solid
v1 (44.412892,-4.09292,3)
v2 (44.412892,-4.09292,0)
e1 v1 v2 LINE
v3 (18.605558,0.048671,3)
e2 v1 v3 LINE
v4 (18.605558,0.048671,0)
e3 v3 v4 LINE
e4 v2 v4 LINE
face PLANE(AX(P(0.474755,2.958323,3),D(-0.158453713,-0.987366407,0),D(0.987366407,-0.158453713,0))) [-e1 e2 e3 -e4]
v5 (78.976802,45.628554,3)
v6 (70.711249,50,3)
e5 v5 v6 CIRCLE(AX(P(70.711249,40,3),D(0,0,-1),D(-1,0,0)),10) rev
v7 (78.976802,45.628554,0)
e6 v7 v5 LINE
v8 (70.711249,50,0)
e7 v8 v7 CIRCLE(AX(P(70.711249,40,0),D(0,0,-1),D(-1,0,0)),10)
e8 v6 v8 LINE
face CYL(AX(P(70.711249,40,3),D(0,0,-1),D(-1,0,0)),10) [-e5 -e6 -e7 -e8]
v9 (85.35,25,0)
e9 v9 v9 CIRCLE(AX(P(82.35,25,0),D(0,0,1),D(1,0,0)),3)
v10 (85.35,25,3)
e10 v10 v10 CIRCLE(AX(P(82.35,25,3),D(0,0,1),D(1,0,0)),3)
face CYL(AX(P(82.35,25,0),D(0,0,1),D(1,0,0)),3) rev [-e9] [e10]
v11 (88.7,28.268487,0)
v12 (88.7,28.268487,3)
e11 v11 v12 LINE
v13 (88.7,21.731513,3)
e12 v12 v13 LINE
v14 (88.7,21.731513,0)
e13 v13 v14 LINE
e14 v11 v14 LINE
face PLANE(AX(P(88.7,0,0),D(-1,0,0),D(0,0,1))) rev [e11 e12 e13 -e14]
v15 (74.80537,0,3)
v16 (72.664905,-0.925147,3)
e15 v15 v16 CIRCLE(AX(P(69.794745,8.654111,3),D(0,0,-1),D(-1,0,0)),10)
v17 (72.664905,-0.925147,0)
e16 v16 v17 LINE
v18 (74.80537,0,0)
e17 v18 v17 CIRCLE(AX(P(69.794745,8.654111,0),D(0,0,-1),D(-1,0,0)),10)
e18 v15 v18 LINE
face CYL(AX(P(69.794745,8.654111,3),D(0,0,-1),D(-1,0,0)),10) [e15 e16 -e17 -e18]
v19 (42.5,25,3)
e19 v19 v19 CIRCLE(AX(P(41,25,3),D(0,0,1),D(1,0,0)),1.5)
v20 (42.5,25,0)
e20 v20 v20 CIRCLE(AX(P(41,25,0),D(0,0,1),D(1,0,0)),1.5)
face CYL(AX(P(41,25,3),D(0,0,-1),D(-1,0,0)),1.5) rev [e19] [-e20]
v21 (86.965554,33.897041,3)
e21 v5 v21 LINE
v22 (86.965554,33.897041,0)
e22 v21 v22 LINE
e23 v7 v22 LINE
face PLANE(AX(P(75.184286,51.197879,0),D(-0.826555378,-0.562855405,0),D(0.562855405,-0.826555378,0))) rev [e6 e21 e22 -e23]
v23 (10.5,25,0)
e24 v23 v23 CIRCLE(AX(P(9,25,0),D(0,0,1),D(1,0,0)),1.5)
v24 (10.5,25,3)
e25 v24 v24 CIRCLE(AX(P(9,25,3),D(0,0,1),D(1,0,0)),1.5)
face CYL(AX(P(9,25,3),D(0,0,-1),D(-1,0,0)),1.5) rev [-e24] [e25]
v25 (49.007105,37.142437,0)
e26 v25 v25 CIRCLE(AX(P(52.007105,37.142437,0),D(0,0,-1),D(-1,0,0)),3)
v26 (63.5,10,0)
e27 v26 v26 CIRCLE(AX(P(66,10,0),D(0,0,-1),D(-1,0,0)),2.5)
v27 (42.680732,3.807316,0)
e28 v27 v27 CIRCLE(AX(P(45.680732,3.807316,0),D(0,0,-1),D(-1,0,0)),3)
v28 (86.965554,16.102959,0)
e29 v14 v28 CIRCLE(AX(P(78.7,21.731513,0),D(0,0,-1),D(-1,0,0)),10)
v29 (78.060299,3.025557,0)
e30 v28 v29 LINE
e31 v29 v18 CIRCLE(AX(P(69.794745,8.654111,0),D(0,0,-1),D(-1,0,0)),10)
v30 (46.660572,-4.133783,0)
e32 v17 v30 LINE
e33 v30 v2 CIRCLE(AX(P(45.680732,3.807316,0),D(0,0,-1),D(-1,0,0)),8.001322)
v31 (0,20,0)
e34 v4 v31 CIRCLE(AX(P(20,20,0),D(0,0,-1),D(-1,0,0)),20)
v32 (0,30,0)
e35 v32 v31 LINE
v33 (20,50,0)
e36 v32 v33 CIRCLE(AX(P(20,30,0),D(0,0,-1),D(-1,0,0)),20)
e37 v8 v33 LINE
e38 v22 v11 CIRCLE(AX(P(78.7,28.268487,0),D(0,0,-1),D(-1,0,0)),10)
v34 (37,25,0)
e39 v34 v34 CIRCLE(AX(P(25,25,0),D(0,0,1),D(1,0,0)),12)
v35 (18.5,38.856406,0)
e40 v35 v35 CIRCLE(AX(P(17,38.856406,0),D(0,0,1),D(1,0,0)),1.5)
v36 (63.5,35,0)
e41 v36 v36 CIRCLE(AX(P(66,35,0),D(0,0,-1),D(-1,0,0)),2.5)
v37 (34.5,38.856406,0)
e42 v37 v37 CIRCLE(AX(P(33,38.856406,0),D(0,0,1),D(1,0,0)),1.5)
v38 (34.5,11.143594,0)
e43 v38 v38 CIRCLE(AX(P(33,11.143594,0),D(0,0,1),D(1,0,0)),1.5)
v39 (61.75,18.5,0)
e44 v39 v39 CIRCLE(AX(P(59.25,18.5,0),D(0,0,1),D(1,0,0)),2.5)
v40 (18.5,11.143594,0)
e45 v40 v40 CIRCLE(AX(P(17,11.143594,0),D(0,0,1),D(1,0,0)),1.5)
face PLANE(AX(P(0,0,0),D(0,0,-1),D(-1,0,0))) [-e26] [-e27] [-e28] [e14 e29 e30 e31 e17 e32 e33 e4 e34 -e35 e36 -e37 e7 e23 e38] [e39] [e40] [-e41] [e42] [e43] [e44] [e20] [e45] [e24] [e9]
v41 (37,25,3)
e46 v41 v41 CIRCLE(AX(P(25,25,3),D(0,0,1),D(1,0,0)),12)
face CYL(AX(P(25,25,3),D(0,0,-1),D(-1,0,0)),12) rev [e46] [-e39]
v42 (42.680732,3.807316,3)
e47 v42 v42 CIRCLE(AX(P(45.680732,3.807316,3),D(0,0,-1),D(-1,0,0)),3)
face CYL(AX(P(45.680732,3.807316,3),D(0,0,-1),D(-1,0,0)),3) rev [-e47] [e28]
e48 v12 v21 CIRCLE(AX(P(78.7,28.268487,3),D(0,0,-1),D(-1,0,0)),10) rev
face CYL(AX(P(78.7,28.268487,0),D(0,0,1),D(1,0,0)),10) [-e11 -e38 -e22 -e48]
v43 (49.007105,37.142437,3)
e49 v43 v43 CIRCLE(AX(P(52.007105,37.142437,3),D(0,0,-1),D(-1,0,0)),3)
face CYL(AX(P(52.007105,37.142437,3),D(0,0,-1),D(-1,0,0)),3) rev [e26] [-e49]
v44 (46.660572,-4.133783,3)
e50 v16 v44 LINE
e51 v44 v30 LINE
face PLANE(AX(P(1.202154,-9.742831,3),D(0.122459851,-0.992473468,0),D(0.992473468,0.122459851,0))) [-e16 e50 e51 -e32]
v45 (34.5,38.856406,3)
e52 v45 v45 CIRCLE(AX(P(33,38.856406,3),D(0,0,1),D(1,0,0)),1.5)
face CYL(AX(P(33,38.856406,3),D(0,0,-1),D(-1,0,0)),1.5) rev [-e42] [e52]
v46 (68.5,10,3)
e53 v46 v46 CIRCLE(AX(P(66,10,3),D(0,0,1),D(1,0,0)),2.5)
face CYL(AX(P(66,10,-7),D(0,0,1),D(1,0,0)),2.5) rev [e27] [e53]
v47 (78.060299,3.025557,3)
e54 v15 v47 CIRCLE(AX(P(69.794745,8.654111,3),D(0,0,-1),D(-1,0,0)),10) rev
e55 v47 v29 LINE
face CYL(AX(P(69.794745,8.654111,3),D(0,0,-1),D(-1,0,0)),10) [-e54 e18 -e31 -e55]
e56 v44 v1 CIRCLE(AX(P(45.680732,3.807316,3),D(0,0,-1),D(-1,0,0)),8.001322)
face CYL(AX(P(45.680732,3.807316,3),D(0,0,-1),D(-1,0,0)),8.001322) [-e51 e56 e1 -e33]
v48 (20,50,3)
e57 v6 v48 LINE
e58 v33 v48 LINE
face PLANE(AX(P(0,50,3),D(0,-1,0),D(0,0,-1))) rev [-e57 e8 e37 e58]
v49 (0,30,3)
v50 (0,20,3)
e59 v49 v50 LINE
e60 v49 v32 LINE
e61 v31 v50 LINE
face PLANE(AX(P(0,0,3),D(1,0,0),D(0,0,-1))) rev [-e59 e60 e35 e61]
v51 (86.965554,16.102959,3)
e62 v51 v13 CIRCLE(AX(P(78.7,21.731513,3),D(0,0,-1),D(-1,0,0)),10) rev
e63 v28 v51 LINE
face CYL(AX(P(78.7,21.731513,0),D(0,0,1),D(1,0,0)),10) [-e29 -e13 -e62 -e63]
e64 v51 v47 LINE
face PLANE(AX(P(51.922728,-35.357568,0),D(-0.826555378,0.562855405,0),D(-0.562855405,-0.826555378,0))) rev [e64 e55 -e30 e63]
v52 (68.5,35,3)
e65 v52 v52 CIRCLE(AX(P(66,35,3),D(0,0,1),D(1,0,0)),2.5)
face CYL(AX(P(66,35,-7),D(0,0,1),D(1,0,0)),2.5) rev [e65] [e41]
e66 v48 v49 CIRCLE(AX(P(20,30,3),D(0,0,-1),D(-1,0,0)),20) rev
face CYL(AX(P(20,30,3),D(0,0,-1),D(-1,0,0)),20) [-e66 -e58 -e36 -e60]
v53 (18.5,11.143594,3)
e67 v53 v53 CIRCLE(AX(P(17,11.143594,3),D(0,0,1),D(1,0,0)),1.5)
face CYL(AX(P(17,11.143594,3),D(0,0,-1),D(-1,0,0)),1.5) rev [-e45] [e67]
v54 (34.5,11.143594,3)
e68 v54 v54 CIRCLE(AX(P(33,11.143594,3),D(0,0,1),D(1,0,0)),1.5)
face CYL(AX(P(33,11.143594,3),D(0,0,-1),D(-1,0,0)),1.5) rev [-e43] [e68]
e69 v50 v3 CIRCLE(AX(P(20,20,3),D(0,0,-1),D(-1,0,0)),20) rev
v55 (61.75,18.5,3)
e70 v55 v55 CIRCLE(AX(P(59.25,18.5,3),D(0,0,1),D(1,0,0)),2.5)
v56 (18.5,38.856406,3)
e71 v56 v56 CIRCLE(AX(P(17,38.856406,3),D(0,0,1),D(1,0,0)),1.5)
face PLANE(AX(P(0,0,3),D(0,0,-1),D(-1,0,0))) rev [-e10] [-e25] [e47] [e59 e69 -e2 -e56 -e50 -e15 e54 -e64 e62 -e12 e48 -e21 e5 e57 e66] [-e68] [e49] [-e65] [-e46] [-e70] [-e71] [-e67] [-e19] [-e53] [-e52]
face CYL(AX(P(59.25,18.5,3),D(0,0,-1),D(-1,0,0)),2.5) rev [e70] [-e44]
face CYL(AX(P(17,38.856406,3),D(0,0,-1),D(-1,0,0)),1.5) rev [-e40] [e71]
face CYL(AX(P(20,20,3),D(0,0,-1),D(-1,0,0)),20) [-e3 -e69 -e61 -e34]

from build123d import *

# Parameters (mm, degrees)
ESBO_O1_W                = 76
ESBO_O1_H                = 50
ESBO_O1_R                = 2.5
ESBO_O1_R_2              = 12
ESBO_O1_R_3              = 1.5
RESSALTO_EXTRUS_O1_DEPTH = 3
ESBO_O2_R                = 2.5
CORTE_EXTRUS_O1_DEPTH    = 3
FILETE1_R                = 20
ESBO_O3_R                = 2.5
RESSALTO_EXTRUS_O2_DEPTH = 3
ESBO_O5_R                = 3
CORTE_EXTRUS_O2_DEPTH    = 92.021975369
RESSALTO_EXTRUS_O3_DEPTH = 3
RESSALTO_EXTRUS_O4_DEPTH = 3
FILETE2_R                = 10
ESBO_O7_R                = 2.5
CORTE_EXTRUS_O3_DEPTH    = 10


with BuildPart() as part:
    # Esboço1 → Ressalto-extrusão1 (new body)
    with BuildSketch(Plane.XY):
        with Locations((38, 25)):
            Rectangle(ESBO_O1_W, ESBO_O1_H)
        with Locations((59.25, 18.5)):
            Circle(ESBO_O1_R, mode=Mode.SUBTRACT)
        with Locations((25, 25)):
            Circle(ESBO_O1_R_2, mode=Mode.SUBTRACT)
        with Locations((17, 38.856406461)):
            Circle(ESBO_O1_R_3, mode=Mode.SUBTRACT)
        with Locations((33, 38.856406461)):
            Circle(ESBO_O1_R_3, mode=Mode.SUBTRACT)
        with Locations((41, 25)):
            Circle(ESBO_O1_R_3, mode=Mode.SUBTRACT)
        with Locations((33, 11.143593539)):
            Circle(ESBO_O1_R_3, mode=Mode.SUBTRACT)
        with Locations((17, 11.143593539)):
            Circle(ESBO_O1_R_3, mode=Mode.SUBTRACT)
        with Locations((9, 25)):
            Circle(ESBO_O1_R_3, mode=Mode.SUBTRACT)
    extrude(amount=RESSALTO_EXTRUS_O1_DEPTH)

    # Esboço2 → Corte-extrusão1 (cut)
    with BuildSketch(Plane.XY.offset(3)):
        with Locations((66, 35)):
            Circle(ESBO_O2_R)
        with Locations((66, 15)):
            Circle(ESBO_O2_R)
    extrude(amount=-CORTE_EXTRUS_O1_DEPTH, mode=Mode.SUBTRACT)

    # Filete1
    filete1_edges = [part.edges().sort_by_distance(p)[0] for p in [
        (0, 50, 1.5),
        (0, 0, 1.5),
    ]]
    fillet(filete1_edges, radius=FILETE1_R)

    # Esboço3 → Ressalto-extrusão2 (add, through all)
    with BuildSketch(Plane.XY.offset(3)):
        with Locations((66, 15)):
            Circle(ESBO_O3_R)
        with Locations((66, 35)):
            Circle(ESBO_O3_R)
    extrude(amount=-RESSALTO_EXTRUS_O2_DEPTH)

    # Esboço5 → Corte-extrusão2 (cut, through all)
    with BuildSketch(Plane(origin=(0, 0, 0), x_dir=(-1, 0, 0), z_dir=(0, 0, -1))):
        with Locations((-45.680731562, 3.807316308)):
            Circle(ESBO_O5_R)
        with Locations((-52.0071049, 37.142437356)):
            Circle(ESBO_O5_R)
    extrude(amount=-CORTE_EXTRUS_O2_DEPTH, mode=Mode.SUBTRACT)

    # Esboço4 → Ressalto-extrusão3 (add, through all)
    with BuildSketch(Plane(origin=(0, 0, 0), x_dir=(-1, 0, 0), z_dir=(0, 0, -1))):
        with BuildLine():
            ThreePointArc((-18.605557994, 0.048670934), (-19.30235443, 0.012171437), (-20, 0))
            Line((-20, 0), (-74.805369877, 0))
            ThreePointArc((-74.805369877, 0), (-73.762195737, -0.525177263), (-72.66490464, -0.925146879))
            Line((-72.66490464, -0.925146879), (-46.660572258, -4.133783454))
            ThreePointArc((-46.660572258, -4.133783454), (-45.535290053, -4.192683692), (-44.412892385, -4.09292021))
            Line((-44.412892385, -4.09292021), (-18.605557994, 0.048670934))
        make_face()
    extrude(amount=-RESSALTO_EXTRUS_O3_DEPTH)

    # Esboço6 → Ressalto-extrusão4 (add, through all)
    with BuildSketch(Plane.XY.offset(3)):
        with BuildLine():
            Line((88.7, 31.35), (76, 50))
            Line((76, 50), (76, 25))
            Line((76, 25), (79.35, 25))
            ThreePointArc((79.35, 25), (82.35, 28), (85.35, 25))
            Line((85.35, 25), (88.7, 25))
            Line((88.7, 25), (88.7, 31.35))
        make_face()
        with BuildLine():
            Line((79.35, 25), (76, 25))
            Line((76, 25), (76, 0))
            Line((76, 0), (88.7, 18.65))
            Line((88.7, 18.65), (88.7, 25))
            Line((88.7, 25), (85.35, 25))
            ThreePointArc((85.35, 25), (82.35, 22), (79.35, 25))
        make_face()
    extrude(amount=-RESSALTO_EXTRUS_O4_DEPTH)

    # Filete2
    # the kernel refuses this fillet: 10 mm, written as the material it takes off along each edge
    with BuildSketch(Plane(origin=(88.7, 18.65, 10.703782372), x_dir=(-0.5628554049483921, -0.8265553781328759, 0), z_dir=(0, 0, -1)), Plane(origin=(88.7, 31.35, 10.703782372), x_dir=(0, -1, 0), z_dir=(0, 0, -1))) as filete2_piece_1:
        with BuildLine():
            CenterArc((FILETE2_R * 0.308151294884, FILETE2_R), FILETE2_R, 235.746501053, 34.253498947)
            Line((-FILETE2_R * 0.254704110065, FILETE2_R * 0.173444621867), (-FILETE2_R * 0.265961218164, FILETE2_R * 0.156913514304))
            Line((-FILETE2_R * 0.265961218164, FILETE2_R * 0.156913514304), (-FILETE2_R * 0.00616302589767, -FILETE2_R * 0.02))
            Line((-FILETE2_R * 0.00616302589767, -FILETE2_R * 0.02), (FILETE2_R * 0.308151294884, -FILETE2_R * 0.02))
            Line((FILETE2_R * 0.308151294884, -FILETE2_R * 0.02), (FILETE2_R * 0.308151294884, 0))
        make_face()
    extrude(amount=18.407564744, mode=Mode.SUBTRACT)
    with BuildSketch(Plane(origin=(76, 50, -13.221878613), x_dir=(-1, 0, 0), z_dir=(0, 0, 1))) as filete2_piece_2:
        with BuildLine():
            CenterArc((FILETE2_R * 0.528875144505, FILETE2_R), FILETE2_R, 214.253498947, 55.746501053)
            Line((-FILETE2_R * 0.297680233628, FILETE2_R * 0.437144595052), (-FILETE2_R * 0.31421134119, FILETE2_R * 0.425887486953))
            Line((-FILETE2_R * 0.31421134119, FILETE2_R * 0.425887486953), (-FILETE2_R * 0.0105775028901, -FILETE2_R * 0.02))
            Line((-FILETE2_R * 0.0105775028901, -FILETE2_R * 0.02), (FILETE2_R * 0.528875144505, -FILETE2_R * 0.02))
            Line((FILETE2_R * 0.528875144505, -FILETE2_R * 0.02), (FILETE2_R * 0.528875144505, 0))
        make_face()
    extrude(amount=29.443757225, mode=Mode.SUBTRACT)
    with BuildSketch(Plane(origin=(76, 0, -9.151102244), x_dir=(-1, 0, 0), z_dir=(0, 0, 1))) as filete2_piece_3:
        with BuildLine():
            CenterArc((6.205254838, -8.65411116), FILETE2_R, 120.070317479, 25.676183574)
            Line((-2.060298944, -3.02555711), (-2.225610019, -2.912986029))
            Line((-2.225610019, -2.912986029), (-0.165311076, 0.112571081))
            Line((-0.165311076, 0.112571081), (0, 0.2))
            ThreePointArc((0, 0.2), (0.597315061, 0.2), (1.094417628, 0.173082223))
            Line((1.094417628, 0.173082223), (1.194630123, 0))
        make_face()
    extrude(amount=21.302204488, mode=Mode.SUBTRACT)

    # Esboço7 → Corte-extrusão3 (cut)
    with BuildSketch(Plane.XY.offset(3)):
        with Locations((66, 35)):
            Circle(ESBO_O7_R)
        with Locations((66, 10)):
            Circle(ESBO_O7_R)
    extrude(amount=-CORTE_EXTRUS_O3_DEPTH, mode=Mode.SUBTRACT)


solid = part.part
